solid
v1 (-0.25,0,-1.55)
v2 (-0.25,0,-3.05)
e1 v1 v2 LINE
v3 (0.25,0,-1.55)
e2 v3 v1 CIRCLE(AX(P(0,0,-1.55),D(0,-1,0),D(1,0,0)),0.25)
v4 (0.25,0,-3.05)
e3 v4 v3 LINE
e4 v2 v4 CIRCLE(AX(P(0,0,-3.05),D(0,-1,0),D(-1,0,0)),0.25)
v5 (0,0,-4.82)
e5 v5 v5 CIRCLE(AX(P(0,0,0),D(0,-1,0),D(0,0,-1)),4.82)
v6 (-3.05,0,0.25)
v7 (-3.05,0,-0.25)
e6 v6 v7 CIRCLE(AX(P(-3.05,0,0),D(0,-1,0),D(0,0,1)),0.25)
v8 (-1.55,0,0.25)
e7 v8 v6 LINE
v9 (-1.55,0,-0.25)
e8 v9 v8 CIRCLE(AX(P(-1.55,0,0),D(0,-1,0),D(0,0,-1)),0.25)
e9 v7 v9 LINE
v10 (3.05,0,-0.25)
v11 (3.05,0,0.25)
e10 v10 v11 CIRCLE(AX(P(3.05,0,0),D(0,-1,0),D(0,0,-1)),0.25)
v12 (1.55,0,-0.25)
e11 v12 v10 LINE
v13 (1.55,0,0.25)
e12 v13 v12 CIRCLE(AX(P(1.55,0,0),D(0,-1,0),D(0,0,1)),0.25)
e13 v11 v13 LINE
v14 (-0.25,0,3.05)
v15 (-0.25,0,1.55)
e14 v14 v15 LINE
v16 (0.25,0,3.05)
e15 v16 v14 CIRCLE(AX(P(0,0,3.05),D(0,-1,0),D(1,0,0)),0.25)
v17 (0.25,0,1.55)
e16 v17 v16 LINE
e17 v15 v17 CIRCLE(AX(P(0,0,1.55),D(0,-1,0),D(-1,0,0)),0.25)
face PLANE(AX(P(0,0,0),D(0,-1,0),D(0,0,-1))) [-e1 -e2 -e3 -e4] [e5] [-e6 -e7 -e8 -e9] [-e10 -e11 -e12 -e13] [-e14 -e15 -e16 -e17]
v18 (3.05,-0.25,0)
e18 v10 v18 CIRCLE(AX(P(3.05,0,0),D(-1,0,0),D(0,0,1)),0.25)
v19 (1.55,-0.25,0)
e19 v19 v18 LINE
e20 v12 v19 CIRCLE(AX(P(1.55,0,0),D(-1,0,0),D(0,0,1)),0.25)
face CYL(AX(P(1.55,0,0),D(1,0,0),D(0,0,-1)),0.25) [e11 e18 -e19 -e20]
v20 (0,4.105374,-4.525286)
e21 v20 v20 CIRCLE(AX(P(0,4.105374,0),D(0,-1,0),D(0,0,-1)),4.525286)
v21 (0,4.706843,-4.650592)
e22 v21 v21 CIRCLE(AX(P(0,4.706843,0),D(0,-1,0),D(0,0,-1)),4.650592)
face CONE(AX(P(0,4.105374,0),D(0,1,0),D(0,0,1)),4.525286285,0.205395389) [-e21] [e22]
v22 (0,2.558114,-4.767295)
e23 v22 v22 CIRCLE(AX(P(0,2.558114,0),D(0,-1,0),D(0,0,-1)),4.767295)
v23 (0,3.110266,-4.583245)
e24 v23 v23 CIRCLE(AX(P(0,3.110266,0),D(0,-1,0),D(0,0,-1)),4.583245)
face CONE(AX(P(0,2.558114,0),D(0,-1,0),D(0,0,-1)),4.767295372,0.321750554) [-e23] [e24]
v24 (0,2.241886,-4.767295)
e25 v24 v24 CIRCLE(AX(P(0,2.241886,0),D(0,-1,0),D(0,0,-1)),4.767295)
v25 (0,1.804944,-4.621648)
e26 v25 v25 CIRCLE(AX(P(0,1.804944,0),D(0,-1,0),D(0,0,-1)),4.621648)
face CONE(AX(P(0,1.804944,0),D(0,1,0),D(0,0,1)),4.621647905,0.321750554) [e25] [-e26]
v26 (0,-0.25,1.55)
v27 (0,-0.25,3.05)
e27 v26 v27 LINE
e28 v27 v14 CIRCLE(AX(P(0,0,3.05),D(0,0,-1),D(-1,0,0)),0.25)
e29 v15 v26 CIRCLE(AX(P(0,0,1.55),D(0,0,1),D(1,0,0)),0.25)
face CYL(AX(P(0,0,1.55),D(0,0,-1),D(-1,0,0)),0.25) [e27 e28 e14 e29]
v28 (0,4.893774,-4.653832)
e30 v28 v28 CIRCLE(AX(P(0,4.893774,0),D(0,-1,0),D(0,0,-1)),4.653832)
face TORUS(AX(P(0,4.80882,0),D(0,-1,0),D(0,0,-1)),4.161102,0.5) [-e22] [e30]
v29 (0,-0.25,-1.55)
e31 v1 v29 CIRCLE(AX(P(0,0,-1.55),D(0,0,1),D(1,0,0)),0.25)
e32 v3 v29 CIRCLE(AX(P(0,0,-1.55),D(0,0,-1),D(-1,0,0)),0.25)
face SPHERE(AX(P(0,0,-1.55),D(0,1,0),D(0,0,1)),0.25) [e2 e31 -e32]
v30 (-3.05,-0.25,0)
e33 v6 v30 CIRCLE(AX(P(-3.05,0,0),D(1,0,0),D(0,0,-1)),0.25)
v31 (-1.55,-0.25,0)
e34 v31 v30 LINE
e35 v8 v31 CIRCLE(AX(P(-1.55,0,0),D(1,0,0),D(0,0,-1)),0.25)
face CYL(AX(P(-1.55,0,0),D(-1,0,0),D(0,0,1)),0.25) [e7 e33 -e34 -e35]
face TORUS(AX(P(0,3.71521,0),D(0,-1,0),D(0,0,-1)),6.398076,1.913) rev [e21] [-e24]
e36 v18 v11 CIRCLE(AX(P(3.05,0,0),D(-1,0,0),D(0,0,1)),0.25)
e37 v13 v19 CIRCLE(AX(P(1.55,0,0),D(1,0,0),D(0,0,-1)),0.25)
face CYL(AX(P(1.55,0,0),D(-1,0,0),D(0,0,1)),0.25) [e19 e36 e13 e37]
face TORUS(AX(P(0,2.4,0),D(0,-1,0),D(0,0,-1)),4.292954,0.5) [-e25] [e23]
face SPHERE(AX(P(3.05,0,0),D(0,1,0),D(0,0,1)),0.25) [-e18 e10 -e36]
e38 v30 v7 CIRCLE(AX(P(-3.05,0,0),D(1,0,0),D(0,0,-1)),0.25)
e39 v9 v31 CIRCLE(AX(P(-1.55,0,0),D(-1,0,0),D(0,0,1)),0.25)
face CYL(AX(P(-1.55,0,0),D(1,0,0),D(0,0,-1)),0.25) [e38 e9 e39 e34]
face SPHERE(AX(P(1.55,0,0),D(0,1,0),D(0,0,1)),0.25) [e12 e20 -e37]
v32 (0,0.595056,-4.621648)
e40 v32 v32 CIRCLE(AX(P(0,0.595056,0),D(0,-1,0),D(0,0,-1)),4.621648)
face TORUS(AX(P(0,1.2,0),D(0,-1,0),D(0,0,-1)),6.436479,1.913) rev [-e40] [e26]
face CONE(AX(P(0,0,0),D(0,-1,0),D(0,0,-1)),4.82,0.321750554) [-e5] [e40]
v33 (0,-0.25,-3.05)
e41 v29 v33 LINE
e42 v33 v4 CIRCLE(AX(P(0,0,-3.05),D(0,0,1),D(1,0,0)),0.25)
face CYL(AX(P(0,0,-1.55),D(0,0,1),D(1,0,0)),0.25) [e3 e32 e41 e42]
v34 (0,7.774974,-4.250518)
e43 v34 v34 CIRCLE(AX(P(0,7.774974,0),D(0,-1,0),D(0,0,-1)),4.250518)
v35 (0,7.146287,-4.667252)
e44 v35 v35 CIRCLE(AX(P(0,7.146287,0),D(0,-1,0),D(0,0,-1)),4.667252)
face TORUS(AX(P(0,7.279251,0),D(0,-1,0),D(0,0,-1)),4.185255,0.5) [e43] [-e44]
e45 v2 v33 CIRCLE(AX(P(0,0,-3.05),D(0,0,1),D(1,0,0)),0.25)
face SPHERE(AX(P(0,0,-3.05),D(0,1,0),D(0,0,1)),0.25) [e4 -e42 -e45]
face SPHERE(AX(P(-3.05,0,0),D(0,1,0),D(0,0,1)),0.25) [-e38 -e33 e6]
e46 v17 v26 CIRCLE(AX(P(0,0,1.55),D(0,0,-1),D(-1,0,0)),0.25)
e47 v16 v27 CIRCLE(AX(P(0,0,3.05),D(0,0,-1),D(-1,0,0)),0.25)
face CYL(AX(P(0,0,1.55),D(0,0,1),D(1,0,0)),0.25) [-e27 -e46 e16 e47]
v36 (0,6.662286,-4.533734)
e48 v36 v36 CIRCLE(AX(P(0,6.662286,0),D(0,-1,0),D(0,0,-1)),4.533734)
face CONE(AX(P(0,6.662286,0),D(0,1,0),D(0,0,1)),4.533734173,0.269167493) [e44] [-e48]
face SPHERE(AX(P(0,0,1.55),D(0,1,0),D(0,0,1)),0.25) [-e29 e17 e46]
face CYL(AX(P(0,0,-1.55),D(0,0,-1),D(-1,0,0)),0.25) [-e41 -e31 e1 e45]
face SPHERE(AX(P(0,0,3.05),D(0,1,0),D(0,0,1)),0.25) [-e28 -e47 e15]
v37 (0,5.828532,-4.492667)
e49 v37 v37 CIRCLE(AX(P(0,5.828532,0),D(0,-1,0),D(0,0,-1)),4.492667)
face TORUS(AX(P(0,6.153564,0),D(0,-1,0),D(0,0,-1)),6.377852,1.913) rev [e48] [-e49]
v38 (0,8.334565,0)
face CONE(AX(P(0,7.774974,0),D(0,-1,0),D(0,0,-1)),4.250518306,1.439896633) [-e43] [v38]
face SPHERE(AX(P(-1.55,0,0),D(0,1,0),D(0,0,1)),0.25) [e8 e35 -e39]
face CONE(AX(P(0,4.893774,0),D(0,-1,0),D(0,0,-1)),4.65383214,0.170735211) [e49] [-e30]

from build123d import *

# Parameters (mm, degrees)
BOSS_EXTRUDE1_DEPTH = 0.25
CIRPATTERN14_COUNT  = 4
FILLET6_R           = 0.25


with BuildPart() as part:
    # Sketch1 → Revolve1 (revolve)
    with BuildSketch(Plane(origin=(0, 0, 0), x_dir=(0, 0, -1), z_dir=(1, 0, 0))):
        with BuildLine():
            Line((0, 0), (4.82, 0))
            Line((4.82, 0), (4.621647905, 0.595056284))
            ThreePointArc((4.621647905, 0.595056284), (4.523479055, 1.2), (4.621647905, 1.804943716))
            Line((4.621647905, 1.804943716), (4.767295372, 2.241886117))
            ThreePointArc((4.767295372, 2.241886117), (4.792953723, 2.4), (4.767295372, 2.558113883))
            Line((4.767295372, 2.558113883), (4.583244679, 3.110265964))
            ThreePointArc((4.583244679, 3.110265964), (4.488312315, 3.603978735), (4.525286285, 4.105374168))
            Line((4.525286285, 4.105374168), (4.650592292, 4.706843002))
            ThreePointArc((4.650592292, 4.706843002), (4.661027001, 4.800155518), (4.65383214, 4.893773587))
            Line((4.65383214, 4.893773587), (4.49266685, 5.828532271))
            ThreePointArc((4.49266685, 5.828532271), (4.467168445, 6.247676675), (4.533734173, 6.662286376))
            Line((4.533734173, 6.662286376), (4.667251519, 7.146286758))
            ThreePointArc((4.667251519, 7.146286758), (4.602010568, 7.555502903), (4.250518306, 7.774973687))
            Line((4.250518306, 7.774973687), (0, 8.334565038))
            Line((0, 8.334565038), (0, 0))
        make_face()
    revolve(axis=Axis((0, 0, 0), (0, 1, 0)))

    # Sketch3 → Boss-Extrude1 (add)
    with BuildSketch(Plane.XZ):
        with BuildLine():
            Line((1.55, 0.25), (3.05, 0.25))
            ThreePointArc((3.05, 0.25), (3.3, 0), (3.05, -0.25))
            Line((3.05, -0.25), (1.55, -0.25))
            ThreePointArc((1.55, -0.25), (1.3, 0), (1.55, 0.25))
        make_face()
    boss_extrude1 = extrude(amount=BOSS_EXTRUDE1_DEPTH)

    # CirPattern14: Boss-Extrude1 ×4 about axis
    cirpattern14_axis = Axis((0, 0, 0), (0, 1, 0))
    for i in range(1, CIRPATTERN14_COUNT):
        add(boss_extrude1.rotate(cirpattern14_axis, i * 360 / CIRPATTERN14_COUNT))

    # Fillet6
    fillet6_edges = [part.edges().sort_by_distance(p)[0] for p in [
        (-2.3, -0.25, -0.25),
        (-3.3, -0.25, 0),
        (-2.3, -0.25, 0.25),
        (-1.3, -0.25, 0),
        (0.25, -0.25, -2.3),
        (0, -0.25, -3.3),
        (-0.25, -0.25, -2.3),
        (0, -0.25, -1.3),
        (2.3, -0.25, 0.25),
        (3.3, -0.25, 0),
        (2.3, -0.25, -0.25),
        (1.3, -0.25, 0),
        (-0.25, -0.25, 2.3),
        (0, -0.25, 3.3),
        (0.25, -0.25, 2.3),
        (0, -0.25, 1.3),
    ]]
    fillet(fillet6_edges, radius=FILLET6_R - 0.0001)  # a hair under: the kernel refuses the full size


solid = part.part
